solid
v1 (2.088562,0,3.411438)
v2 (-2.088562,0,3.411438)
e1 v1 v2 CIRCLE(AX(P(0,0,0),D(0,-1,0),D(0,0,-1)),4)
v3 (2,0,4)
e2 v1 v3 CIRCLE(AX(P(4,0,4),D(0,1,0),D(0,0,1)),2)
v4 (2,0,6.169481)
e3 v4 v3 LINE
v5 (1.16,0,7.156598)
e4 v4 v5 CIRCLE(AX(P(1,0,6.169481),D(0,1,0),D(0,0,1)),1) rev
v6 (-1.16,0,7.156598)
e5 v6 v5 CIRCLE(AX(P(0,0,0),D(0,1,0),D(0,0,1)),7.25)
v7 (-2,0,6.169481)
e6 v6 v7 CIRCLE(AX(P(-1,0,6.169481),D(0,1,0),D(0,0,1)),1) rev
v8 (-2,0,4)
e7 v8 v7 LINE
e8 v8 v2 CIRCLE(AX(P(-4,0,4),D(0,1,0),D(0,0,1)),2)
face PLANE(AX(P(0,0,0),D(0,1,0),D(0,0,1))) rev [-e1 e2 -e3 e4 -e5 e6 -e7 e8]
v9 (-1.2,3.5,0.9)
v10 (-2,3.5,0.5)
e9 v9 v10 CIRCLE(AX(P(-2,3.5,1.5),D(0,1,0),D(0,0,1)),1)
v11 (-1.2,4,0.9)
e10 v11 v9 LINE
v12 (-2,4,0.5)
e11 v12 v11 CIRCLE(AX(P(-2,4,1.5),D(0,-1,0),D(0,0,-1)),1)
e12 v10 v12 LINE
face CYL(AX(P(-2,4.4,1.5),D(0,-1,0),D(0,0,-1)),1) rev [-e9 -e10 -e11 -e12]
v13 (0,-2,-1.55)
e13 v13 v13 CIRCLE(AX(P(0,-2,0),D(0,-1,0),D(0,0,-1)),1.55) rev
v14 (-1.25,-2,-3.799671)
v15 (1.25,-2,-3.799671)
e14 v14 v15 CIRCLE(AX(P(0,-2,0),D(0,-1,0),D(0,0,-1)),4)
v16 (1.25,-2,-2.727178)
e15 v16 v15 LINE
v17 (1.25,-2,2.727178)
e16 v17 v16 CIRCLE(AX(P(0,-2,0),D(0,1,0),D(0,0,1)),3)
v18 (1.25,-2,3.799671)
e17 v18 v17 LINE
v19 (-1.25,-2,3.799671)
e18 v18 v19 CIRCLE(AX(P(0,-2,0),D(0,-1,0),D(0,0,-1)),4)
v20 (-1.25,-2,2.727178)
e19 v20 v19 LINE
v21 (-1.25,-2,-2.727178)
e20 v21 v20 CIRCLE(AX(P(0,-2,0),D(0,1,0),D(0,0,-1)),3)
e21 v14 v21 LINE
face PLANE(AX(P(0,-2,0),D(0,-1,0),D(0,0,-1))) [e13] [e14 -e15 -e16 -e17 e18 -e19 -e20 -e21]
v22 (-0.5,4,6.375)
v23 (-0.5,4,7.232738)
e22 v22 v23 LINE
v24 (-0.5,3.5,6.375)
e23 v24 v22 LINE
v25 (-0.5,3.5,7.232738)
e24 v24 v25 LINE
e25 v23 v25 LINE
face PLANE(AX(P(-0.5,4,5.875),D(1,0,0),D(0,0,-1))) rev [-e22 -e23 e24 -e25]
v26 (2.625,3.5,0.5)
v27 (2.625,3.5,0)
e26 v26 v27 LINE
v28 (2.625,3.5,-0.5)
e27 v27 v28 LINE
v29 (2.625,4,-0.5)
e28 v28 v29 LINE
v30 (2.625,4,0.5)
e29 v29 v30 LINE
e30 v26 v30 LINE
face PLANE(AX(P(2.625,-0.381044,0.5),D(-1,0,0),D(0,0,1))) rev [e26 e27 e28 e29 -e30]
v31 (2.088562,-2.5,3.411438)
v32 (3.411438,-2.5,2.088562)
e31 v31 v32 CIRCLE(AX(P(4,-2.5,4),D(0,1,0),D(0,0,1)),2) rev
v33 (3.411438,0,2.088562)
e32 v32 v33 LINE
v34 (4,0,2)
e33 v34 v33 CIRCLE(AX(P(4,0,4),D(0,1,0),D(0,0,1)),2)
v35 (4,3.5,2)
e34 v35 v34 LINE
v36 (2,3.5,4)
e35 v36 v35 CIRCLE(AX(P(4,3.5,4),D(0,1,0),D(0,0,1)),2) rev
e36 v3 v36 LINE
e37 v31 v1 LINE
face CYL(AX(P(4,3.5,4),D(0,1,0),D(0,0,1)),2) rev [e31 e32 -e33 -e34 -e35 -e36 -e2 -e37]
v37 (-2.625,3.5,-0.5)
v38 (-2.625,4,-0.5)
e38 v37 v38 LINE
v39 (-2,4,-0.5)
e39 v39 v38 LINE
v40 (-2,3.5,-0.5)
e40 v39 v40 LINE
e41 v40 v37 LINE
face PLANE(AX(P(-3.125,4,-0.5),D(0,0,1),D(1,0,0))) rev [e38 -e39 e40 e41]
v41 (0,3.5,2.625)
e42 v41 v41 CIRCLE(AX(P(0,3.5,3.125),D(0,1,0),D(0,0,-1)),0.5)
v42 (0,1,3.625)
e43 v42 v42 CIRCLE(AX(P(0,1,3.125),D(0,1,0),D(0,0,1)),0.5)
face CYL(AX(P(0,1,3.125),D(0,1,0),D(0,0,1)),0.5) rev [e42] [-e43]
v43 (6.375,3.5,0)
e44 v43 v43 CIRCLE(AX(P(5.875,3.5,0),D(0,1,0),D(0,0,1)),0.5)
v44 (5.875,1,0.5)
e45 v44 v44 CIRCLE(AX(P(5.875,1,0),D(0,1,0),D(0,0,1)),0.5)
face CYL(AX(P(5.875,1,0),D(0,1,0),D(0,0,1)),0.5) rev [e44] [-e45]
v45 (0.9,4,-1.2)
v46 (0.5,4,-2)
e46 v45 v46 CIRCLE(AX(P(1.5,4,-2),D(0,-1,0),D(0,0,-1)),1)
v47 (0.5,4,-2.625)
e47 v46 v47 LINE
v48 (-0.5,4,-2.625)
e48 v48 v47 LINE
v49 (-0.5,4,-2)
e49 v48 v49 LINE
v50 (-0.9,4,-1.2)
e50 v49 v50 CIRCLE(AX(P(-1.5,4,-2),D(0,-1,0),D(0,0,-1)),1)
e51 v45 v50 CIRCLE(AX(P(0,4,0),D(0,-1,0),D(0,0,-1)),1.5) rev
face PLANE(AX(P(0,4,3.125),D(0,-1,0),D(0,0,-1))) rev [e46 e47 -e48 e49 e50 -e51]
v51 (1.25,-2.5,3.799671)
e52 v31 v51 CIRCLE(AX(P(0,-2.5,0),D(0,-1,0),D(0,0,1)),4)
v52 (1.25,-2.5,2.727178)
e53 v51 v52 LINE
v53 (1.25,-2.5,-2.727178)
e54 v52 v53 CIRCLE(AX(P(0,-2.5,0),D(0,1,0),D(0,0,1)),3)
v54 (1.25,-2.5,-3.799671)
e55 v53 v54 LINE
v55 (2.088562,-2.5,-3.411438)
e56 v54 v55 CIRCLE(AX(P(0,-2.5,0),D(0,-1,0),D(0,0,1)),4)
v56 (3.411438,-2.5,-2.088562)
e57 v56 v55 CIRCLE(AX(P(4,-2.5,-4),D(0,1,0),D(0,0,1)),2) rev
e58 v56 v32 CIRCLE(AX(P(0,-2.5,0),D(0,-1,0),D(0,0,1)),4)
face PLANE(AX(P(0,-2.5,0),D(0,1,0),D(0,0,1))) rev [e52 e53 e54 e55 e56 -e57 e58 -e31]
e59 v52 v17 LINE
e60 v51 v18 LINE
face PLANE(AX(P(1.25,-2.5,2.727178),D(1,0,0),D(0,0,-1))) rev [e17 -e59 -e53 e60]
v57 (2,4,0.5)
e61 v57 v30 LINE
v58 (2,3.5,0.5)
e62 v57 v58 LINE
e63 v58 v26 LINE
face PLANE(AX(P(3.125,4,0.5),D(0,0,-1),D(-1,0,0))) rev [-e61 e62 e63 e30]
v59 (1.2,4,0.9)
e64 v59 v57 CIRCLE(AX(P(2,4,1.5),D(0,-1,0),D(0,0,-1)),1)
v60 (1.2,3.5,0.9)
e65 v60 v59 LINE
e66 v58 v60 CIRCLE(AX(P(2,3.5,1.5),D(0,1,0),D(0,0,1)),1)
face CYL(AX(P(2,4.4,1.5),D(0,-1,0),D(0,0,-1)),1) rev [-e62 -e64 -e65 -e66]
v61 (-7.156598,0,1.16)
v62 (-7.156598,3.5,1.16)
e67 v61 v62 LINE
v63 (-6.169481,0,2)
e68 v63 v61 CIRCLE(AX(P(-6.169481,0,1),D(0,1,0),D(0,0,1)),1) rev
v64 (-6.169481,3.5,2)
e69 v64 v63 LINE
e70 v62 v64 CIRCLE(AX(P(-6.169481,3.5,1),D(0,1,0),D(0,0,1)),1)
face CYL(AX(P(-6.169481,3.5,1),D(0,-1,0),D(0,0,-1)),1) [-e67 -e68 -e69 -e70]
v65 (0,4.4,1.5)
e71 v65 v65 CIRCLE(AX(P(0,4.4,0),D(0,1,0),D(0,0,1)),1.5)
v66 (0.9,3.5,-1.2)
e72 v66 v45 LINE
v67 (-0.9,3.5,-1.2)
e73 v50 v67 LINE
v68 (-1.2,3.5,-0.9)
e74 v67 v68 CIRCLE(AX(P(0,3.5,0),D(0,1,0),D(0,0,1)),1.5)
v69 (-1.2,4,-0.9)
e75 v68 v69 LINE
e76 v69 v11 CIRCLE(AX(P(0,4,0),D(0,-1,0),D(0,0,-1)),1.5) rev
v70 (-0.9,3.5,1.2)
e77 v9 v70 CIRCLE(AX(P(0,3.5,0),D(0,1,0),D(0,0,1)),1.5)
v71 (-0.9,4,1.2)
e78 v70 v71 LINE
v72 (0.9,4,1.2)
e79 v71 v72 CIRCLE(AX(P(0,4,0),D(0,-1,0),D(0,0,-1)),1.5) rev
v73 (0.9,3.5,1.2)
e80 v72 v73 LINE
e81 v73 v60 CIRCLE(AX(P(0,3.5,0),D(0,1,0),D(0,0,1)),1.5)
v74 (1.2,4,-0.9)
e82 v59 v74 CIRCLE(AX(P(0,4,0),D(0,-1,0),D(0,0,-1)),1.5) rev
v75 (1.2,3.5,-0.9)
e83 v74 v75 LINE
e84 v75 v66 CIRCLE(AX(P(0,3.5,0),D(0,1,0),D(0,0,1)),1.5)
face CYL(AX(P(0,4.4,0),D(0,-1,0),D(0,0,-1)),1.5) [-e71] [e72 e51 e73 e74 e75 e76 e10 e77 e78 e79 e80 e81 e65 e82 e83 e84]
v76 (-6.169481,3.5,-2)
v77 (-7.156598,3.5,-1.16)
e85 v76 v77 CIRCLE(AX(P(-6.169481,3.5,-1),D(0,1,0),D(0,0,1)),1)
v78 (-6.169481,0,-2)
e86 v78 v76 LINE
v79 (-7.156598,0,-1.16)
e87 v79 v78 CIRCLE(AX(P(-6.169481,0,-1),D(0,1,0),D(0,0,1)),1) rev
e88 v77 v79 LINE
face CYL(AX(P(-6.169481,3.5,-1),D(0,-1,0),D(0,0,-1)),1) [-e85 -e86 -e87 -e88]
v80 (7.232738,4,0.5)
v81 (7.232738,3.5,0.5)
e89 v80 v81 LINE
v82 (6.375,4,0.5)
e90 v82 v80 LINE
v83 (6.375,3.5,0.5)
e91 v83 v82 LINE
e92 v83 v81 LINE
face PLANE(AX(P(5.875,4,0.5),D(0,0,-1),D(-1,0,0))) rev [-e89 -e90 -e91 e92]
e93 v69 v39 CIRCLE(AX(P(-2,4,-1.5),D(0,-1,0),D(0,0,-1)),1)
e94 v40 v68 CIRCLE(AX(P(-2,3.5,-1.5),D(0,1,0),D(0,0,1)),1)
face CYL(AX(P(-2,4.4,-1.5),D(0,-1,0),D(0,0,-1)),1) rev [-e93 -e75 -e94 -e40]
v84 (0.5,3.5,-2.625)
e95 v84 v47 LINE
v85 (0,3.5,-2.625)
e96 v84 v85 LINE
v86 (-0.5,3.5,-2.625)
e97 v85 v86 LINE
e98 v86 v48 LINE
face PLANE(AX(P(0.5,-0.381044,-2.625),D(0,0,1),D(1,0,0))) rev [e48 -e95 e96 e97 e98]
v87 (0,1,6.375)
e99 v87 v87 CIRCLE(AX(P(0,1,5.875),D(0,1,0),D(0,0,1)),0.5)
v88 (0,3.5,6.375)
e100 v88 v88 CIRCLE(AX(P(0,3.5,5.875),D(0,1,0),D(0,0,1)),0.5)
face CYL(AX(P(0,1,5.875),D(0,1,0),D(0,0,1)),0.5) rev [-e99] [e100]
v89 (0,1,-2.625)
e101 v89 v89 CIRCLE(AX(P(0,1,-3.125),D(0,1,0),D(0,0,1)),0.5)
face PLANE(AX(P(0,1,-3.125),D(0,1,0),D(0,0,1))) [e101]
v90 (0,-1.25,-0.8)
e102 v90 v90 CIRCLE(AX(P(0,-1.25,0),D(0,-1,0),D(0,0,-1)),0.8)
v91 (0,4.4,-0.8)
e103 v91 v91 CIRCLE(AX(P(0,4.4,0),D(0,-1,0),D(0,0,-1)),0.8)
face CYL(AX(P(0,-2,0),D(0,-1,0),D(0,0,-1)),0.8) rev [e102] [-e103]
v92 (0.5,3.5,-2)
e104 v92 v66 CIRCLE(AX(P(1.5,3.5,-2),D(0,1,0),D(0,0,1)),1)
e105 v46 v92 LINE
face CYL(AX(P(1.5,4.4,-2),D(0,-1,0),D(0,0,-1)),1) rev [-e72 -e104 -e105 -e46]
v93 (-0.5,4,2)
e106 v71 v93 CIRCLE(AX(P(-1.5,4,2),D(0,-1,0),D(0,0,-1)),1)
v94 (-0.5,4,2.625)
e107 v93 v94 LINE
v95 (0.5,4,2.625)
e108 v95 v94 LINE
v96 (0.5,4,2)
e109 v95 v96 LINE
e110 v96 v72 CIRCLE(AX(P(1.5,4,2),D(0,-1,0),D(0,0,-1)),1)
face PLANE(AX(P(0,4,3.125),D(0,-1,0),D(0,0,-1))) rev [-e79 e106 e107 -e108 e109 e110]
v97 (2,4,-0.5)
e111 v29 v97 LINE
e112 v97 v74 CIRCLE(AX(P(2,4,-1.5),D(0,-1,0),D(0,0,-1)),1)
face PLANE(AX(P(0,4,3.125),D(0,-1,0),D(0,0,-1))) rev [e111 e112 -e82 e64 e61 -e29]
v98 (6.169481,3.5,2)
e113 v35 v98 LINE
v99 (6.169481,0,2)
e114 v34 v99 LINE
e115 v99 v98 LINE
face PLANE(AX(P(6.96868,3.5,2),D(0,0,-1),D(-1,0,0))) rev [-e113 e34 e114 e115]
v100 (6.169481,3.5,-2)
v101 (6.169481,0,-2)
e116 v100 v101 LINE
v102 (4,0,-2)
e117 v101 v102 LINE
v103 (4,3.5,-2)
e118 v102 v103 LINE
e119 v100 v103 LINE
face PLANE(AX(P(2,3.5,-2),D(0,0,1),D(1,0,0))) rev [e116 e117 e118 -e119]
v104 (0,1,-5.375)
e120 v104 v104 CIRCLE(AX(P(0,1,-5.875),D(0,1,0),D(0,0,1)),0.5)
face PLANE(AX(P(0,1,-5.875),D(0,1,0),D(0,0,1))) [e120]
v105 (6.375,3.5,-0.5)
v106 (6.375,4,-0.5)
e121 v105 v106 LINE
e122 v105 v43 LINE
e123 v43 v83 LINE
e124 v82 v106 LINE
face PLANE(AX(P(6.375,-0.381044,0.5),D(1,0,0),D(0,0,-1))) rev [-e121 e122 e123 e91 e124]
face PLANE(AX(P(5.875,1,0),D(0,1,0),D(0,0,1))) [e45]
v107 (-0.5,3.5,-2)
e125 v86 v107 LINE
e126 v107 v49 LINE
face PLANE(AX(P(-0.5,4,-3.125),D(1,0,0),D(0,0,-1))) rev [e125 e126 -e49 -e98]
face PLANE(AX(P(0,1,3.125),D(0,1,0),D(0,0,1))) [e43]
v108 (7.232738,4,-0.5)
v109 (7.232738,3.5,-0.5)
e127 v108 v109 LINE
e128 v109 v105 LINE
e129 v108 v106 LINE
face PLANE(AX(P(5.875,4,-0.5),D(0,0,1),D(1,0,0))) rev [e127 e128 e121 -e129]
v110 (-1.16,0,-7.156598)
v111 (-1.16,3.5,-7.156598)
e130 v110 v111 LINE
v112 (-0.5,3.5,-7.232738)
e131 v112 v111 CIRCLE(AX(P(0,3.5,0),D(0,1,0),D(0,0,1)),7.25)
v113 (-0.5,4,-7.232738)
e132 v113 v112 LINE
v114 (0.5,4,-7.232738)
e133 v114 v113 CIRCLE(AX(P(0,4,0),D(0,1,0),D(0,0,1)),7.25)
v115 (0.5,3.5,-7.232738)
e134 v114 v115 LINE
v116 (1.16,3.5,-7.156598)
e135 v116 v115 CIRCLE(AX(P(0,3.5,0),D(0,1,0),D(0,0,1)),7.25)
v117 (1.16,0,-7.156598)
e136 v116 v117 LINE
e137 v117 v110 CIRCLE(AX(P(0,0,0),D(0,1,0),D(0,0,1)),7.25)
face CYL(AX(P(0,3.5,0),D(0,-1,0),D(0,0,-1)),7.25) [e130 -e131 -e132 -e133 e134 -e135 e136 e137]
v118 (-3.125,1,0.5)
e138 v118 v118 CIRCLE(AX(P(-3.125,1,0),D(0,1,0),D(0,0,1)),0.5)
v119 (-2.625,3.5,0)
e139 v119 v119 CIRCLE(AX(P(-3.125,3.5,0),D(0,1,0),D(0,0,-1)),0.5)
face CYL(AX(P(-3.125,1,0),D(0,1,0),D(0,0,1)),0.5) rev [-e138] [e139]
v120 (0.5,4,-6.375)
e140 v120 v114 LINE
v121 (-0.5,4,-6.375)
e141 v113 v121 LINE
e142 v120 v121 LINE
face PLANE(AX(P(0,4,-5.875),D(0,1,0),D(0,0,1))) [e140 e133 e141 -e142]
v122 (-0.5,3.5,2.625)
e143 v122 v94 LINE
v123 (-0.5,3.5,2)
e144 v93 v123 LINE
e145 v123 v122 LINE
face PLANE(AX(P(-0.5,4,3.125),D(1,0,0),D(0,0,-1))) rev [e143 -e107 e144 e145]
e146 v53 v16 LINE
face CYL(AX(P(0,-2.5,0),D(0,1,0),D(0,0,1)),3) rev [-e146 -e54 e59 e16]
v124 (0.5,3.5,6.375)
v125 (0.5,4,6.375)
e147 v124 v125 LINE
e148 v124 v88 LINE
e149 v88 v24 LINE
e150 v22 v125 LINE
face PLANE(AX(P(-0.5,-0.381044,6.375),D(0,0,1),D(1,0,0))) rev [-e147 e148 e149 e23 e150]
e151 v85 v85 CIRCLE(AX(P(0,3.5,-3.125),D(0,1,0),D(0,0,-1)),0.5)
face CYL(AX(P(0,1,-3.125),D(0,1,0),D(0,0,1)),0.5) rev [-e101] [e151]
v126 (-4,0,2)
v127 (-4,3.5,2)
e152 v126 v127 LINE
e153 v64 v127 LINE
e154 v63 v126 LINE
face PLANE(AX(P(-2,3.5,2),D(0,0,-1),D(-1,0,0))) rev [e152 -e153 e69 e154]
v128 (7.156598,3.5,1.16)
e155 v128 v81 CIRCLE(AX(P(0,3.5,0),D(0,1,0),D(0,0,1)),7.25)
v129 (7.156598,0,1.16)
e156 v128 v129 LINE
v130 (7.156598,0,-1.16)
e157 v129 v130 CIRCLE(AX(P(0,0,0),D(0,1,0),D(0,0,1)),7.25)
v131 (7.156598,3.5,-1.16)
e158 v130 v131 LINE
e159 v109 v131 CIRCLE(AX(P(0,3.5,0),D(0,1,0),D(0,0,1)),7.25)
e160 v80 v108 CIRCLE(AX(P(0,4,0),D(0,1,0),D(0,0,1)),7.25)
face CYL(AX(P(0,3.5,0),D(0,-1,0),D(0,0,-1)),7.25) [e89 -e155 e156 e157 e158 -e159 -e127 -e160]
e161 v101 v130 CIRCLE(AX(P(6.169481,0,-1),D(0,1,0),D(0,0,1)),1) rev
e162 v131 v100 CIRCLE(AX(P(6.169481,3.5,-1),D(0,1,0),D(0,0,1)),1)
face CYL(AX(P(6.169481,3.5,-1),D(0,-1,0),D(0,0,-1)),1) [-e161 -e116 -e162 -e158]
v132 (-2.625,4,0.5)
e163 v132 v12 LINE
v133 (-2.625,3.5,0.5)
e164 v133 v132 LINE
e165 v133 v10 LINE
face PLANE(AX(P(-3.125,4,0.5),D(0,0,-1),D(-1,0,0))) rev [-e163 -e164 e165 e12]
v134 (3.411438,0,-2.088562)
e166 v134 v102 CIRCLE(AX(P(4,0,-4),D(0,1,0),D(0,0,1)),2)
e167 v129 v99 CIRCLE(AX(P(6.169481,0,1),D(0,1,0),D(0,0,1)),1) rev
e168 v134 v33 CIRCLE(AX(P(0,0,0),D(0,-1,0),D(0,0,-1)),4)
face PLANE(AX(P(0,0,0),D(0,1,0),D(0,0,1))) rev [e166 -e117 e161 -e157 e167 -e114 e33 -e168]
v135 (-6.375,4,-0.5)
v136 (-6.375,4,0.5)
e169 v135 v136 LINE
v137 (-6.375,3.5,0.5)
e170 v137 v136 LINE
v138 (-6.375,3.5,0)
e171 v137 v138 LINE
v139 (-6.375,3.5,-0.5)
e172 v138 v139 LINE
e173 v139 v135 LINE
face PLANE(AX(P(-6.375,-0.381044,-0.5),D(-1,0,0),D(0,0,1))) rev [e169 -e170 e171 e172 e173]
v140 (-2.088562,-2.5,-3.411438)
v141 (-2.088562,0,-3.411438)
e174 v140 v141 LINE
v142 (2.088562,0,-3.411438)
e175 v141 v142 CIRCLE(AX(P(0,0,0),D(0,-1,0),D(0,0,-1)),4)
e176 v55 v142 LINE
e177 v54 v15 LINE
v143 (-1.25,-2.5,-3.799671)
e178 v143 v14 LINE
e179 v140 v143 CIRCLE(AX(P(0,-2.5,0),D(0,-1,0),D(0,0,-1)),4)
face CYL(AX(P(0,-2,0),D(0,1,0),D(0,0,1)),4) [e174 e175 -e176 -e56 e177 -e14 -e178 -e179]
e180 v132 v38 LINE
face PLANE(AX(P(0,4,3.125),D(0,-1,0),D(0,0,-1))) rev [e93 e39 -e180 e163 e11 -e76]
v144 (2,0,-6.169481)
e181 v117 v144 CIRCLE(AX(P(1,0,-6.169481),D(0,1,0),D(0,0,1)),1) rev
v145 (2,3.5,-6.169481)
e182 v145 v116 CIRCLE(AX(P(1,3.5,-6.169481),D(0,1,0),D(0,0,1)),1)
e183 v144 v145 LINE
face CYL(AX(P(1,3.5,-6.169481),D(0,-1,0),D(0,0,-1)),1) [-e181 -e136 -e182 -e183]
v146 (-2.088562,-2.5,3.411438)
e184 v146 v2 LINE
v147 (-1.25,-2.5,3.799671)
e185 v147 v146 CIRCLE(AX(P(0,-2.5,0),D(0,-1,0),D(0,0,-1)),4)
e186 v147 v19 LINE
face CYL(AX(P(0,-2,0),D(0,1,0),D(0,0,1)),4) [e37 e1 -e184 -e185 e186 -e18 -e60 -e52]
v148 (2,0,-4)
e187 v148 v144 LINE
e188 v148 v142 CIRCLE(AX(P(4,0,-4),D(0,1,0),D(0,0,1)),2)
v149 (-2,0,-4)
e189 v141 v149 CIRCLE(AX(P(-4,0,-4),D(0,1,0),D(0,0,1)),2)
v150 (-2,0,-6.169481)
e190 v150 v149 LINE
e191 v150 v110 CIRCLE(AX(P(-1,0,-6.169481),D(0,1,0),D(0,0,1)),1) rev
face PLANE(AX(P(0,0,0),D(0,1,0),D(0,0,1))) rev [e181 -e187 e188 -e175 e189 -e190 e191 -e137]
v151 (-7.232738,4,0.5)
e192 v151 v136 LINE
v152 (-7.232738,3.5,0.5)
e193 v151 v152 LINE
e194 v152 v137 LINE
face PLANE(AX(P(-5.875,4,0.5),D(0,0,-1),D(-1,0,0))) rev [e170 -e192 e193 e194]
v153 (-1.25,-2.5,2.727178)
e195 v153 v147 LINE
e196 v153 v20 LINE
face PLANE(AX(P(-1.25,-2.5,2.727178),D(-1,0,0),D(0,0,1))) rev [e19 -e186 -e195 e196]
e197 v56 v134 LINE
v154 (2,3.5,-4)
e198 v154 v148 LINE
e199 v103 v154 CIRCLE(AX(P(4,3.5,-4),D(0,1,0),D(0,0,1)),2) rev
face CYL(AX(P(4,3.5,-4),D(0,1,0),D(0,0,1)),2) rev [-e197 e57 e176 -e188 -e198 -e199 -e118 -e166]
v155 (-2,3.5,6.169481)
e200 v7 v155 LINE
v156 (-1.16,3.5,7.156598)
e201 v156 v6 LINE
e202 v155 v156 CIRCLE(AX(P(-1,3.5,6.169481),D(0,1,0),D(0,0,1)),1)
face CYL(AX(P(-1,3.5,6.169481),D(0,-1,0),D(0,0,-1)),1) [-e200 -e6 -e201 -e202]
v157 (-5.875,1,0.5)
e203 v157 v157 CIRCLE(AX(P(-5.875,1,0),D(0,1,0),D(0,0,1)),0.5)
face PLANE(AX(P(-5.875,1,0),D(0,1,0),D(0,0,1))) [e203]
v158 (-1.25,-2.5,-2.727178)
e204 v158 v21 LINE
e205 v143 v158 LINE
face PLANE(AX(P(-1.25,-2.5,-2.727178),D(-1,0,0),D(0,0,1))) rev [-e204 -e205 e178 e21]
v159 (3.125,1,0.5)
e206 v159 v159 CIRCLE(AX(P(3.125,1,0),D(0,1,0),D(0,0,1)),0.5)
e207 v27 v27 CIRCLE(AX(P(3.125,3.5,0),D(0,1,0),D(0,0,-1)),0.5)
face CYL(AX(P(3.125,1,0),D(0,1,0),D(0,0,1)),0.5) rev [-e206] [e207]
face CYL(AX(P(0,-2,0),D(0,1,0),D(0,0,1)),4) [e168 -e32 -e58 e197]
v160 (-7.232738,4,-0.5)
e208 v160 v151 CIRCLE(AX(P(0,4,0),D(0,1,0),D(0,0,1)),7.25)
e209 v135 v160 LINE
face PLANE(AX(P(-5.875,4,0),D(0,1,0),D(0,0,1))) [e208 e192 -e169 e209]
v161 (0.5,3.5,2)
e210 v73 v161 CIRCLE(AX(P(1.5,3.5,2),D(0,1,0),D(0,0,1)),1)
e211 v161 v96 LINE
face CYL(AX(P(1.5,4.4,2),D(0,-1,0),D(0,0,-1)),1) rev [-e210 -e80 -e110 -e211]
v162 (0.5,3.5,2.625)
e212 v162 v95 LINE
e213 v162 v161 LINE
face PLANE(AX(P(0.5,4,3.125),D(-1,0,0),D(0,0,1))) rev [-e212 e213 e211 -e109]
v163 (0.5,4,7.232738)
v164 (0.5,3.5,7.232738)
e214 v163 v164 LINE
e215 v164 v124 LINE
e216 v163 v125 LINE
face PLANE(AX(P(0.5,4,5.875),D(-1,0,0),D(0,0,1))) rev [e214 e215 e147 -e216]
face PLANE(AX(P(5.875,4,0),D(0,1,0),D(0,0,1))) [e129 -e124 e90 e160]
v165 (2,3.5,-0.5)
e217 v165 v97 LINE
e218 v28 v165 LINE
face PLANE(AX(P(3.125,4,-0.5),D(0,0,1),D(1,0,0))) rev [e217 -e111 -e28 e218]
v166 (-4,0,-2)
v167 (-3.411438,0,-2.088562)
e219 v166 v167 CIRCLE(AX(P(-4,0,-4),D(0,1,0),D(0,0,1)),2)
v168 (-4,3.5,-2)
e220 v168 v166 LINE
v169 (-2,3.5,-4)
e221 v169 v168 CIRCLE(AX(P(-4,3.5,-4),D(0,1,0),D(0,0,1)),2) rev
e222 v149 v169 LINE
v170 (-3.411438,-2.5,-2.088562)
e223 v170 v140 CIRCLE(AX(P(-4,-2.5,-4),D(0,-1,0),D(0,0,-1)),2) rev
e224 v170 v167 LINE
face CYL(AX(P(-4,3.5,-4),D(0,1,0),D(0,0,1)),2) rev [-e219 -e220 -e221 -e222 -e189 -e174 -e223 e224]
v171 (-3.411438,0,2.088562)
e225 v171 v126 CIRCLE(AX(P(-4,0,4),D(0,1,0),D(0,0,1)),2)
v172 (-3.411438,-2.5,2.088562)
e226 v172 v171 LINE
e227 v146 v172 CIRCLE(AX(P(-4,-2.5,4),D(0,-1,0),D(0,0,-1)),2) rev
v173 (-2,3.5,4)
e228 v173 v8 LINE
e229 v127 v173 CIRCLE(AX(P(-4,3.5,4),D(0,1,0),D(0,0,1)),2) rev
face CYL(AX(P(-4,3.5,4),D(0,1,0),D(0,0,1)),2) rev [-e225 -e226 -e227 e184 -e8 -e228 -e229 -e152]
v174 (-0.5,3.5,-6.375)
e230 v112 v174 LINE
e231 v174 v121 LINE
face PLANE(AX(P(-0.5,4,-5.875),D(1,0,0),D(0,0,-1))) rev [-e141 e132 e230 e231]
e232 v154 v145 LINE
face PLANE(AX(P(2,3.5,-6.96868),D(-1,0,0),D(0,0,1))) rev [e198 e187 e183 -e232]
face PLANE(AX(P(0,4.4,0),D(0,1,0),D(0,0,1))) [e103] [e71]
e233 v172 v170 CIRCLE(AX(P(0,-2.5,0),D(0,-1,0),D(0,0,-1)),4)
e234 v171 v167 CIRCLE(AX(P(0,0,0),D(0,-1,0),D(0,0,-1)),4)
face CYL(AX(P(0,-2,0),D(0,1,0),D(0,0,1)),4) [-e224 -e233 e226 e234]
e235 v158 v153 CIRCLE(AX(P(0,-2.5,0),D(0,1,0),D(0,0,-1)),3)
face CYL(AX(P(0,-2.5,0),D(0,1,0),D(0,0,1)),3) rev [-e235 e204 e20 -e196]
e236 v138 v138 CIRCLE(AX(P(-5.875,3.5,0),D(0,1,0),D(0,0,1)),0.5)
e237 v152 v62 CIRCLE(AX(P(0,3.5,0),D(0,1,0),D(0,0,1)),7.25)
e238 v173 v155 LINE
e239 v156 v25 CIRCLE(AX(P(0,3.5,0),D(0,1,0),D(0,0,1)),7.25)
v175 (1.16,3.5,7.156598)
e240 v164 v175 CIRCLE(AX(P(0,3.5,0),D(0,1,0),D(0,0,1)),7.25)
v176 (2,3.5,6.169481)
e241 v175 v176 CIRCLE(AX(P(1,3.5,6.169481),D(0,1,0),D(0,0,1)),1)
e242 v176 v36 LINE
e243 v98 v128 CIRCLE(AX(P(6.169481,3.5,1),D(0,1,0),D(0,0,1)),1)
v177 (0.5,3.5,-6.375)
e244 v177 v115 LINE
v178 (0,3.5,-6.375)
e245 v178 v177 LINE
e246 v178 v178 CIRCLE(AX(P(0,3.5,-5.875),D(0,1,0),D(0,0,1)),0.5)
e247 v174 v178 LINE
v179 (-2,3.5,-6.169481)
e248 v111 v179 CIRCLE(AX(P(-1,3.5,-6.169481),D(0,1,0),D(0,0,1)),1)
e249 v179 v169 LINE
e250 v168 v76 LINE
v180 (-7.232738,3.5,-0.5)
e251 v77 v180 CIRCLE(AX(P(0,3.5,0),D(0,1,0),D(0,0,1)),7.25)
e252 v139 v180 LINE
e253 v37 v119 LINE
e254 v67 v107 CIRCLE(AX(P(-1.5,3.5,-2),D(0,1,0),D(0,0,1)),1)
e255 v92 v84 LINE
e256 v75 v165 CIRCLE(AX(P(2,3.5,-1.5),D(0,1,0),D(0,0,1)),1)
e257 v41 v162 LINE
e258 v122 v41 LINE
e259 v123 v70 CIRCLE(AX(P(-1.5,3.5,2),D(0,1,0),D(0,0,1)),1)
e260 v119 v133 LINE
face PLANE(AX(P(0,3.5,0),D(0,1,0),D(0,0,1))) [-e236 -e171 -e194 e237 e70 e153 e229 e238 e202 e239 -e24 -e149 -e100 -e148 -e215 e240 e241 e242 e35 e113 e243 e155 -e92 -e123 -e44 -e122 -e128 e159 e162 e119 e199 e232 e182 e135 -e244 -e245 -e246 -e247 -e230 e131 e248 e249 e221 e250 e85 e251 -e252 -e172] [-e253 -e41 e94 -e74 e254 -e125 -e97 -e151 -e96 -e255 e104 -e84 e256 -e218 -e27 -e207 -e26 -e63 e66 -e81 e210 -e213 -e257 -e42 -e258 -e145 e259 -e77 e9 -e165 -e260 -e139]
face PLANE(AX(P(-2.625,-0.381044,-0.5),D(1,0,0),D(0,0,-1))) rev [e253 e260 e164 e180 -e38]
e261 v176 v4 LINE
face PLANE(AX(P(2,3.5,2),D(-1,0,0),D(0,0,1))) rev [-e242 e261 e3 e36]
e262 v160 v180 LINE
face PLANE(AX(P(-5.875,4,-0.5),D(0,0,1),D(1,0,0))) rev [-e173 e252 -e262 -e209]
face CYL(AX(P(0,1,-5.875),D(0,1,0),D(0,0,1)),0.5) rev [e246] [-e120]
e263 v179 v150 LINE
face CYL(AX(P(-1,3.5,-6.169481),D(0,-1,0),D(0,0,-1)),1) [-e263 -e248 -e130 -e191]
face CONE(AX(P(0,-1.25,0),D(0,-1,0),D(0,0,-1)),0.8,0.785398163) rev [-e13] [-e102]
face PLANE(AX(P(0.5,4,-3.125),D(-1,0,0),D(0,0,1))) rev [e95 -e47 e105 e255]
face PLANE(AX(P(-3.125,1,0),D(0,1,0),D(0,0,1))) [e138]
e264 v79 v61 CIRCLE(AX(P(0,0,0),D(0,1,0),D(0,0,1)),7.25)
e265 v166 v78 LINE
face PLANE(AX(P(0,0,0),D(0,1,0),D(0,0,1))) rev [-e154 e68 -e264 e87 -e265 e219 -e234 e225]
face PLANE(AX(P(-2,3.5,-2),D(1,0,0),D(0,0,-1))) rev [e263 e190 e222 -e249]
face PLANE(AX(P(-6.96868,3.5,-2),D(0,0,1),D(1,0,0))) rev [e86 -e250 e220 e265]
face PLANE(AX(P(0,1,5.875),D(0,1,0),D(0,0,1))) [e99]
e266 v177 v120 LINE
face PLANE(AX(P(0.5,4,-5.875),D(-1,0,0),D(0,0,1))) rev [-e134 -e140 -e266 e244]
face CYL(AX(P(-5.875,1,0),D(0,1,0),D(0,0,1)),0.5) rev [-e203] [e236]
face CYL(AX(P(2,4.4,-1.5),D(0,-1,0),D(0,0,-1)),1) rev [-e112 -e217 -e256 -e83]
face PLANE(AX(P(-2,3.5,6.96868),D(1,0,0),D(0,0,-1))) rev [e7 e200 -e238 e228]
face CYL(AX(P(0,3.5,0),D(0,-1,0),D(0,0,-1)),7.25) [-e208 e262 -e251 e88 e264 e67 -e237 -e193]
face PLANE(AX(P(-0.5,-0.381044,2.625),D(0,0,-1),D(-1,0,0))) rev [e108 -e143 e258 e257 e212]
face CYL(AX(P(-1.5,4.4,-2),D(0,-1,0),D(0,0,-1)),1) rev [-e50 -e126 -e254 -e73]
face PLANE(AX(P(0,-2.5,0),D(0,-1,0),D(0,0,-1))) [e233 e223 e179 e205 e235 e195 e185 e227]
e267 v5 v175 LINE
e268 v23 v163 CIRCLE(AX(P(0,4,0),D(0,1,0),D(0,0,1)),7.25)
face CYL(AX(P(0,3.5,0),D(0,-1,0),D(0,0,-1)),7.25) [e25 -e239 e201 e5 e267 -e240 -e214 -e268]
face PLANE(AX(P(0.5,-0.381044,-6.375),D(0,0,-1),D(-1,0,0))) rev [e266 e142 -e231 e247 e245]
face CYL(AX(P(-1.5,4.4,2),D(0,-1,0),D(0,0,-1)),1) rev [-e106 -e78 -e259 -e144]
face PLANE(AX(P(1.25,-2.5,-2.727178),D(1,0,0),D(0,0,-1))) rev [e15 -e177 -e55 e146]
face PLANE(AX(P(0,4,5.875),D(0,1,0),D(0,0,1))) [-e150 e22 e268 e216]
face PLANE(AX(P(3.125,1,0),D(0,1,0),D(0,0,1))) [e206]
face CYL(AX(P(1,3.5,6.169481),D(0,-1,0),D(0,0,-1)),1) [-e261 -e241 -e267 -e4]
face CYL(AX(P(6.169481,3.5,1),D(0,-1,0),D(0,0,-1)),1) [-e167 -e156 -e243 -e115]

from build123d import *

# Parameters (mm, degrees)
BOSS_EXTRUDE1_DEPTH   = 3.5
BOSS_EXTRUDE2_DEPTH   = 0.5
SKETCH6_R             = 4
BOSS_EXTRUDE4_DEPTH   = 2
FILLET1_R             = 1
SKETCH13_R            = 1.5
BOSS_EXTRUDE7_DEPTH   = 0.9
M2X0_4_TAPPED_HOLE1_D = 1.6
BOSS_EXTRUDE5_DEPTH   = 0.5
CUT_EXTRUDE1_START    = -3
SKETCH5_R             = 0.5
CUT_EXTRUDE1_DEPTH    = 3
SKETCH10_W            = 1
SKETCH10_H            = 3.75
SKETCH10_W_2          = 3.75
SKETCH10_H_2          = 1
CUT_EXTRUDE2_DEPTH    = 0.5
CHAMFER1_SIZE         = 0.75
FILLET2_R             = 2
CUT_EXTRUDE3_REACH    = 13.157
FILLET3_R             = 1


with BuildPart() as part:
    # Sketch3 → Boss-Extrude1 (new body)
    with BuildSketch(Plane(origin=(0, 0, 0), x_dir=(1, 0, 0), z_dir=(0, 1, 0))):
        with BuildLine():
            Line((-2, -6.968679932), (-2, -2))
            Line((-2, -2), (-6.968679932, -2))
            ThreePointArc((-6.968679932, -2), (-7.179325508, -1.009844169), (-7.25, 0))
            ThreePointArc((-7.25, 0), (-7.179325508, 1.009844169), (-6.968679932, 2))
            Line((-6.968679932, 2), (-2, 2))
            Line((-2, 2), (-2, 6.968679932))
            ThreePointArc((-2, 6.968679932), (-1.009844169, 7.179325508), (0, 7.25))
            ThreePointArc((0, 7.25), (1.009844169, 7.179325508), (2, 6.968679932))
            Line((2, 6.968679932), (2, 2))
            Line((2, 2), (6.968679932, 2))
            ThreePointArc((6.968679932, 2), (7.179325508, 1.009844169), (7.25, 0))
            ThreePointArc((7.25, 0), (7.179325508, -1.009844169), (6.968679932, -2))
            Line((6.968679932, -2), (2, -2))
            Line((2, -2), (2, -6.968679932))
            ThreePointArc((2, -6.968679932), (1.009844169, -7.179325508), (0, -7.25))
            ThreePointArc((0, -7.25), (-1.009844169, -7.179325508), (-2, -6.968679932))
        make_face()
    extrude(amount=BOSS_EXTRUDE1_DEPTH)

    # Sketch4 → Boss-Extrude2 (add)
    with BuildSketch(Plane(origin=(0, 3.5, 0), x_dir=(-1, 0, 0), z_dir=(0, 1, 0))):
        with BuildLine():
            Line((-0.5, 5.875), (-0.5, 7.232738071))
            ThreePointArc((-0.5, 7.232738071), (0, 7.25), (0.5, 7.232738071))
            Line((0.5, 7.232738071), (0.5, 5.875))
            ThreePointArc((0.5, 5.875), (0, 5.375), (-0.5, 5.875))
        make_face()
        with BuildLine():
            Line((0.5, 3.125), (0.5, 0.5))
            Line((0.5, 0.5), (3.125, 0.5))
            ThreePointArc((3.125, 0.5), (3.625, 0), (3.125, -0.5))
            Line((3.125, -0.5), (0.5, -0.5))
            Line((0.5, -0.5), (0.5, -3.125))
            ThreePointArc((0.5, -3.125), (0, -3.625), (-0.5, -3.125))
            Line((-0.5, -3.125), (-0.5, -0.5))
            Line((-0.5, -0.5), (-3.125, -0.5))
            ThreePointArc((-3.125, -0.5), (-3.625, 0), (-3.125, 0.5))
            Line((-3.125, 0.5), (-0.5, 0.5))
            Line((-0.5, 0.5), (-0.5, 3.125))
            ThreePointArc((-0.5, 3.125), (0, 3.625), (0.5, 3.125))
        make_face()
        with BuildLine():
            Line((5.875, 0.5), (7.232738071, 0.5))
            ThreePointArc((7.232738071, 0.5), (7.25, 0), (7.232738071, -0.5))
            Line((7.232738071, -0.5), (5.875, -0.5))
            ThreePointArc((5.875, -0.5), (5.375, 0), (5.875, 0.5))
        make_face()
        with BuildLine():
            Line((0.5, -5.875), (0.5, -7.232738071))
            ThreePointArc((0.5, -7.232738071), (0, -7.25), (-0.5, -7.232738071))
            Line((-0.5, -7.232738071), (-0.5, -5.875))
            ThreePointArc((-0.5, -5.875), (0, -5.375), (0.5, -5.875))
        make_face()
        with BuildLine():
            Line((-5.875, -0.5), (-7.232738071, -0.5))
            ThreePointArc((-7.232738071, -0.5), (-7.25, 0), (-7.232738071, 0.5))
            Line((-7.232738071, 0.5), (-5.875, 0.5))
            ThreePointArc((-5.875, 0.5), (-5.375, 0), (-5.875, -0.5))
        make_face()
    extrude(amount=BOSS_EXTRUDE2_DEPTH)

    # Sketch6 → Boss-Extrude4 (add)
    with BuildSketch(Plane.XZ):
        with Locations(Location((0, 0, 0), (0, 0, 120))):
            Circle(SKETCH6_R)
    extrude(amount=BOSS_EXTRUDE4_DEPTH)

    # Fillet1
    fillet1_edges = [part.edges().sort_by_distance(p)[0] for p in [
        (-2, 1.75, 6.968679932),
        (-6.968679932, 1.75, 2),
        (-6.968679932, 1.75, -2),
        (-2, 1.75, -6.968679932),
        (2, 1.75, -6.968679932),
        (6.968679932, 1.75, -2),
        (6.968679932, 1.75, 2),
        (2, 1.75, 6.968679932),
    ]]
    fillet(fillet1_edges, radius=FILLET1_R)

    # Sketch13 → Boss-Extrude7 (add)
    with BuildSketch(Plane(origin=(0, 3.5, 0), x_dir=(1, 0, 0), z_dir=(0, 1, 0))):
        with Locations(Location((0, 0, 0), (0, 0, 109.471220634))):
            Circle(SKETCH13_R)
    extrude(amount=BOSS_EXTRUDE7_DEPTH)

    # M2x0.4 Tapped Hole1 (through all)
    with Locations(Plane(origin=(0, -2, 0), x_dir=(-1, 0, 0), z_dir=(0, -1, 0))):
        with Locations((0, 0)):
            Hole(M2X0_4_TAPPED_HOLE1_D / 2)

    # Sketch9 → Boss-Extrude5 (add)
    with BuildSketch(Plane.XZ.offset(2)):
        with BuildLine():
            Line((-1.25, -2.727178029), (-1.25, -3.799671038))
            ThreePointArc((-1.25, -3.799671038), (-4, 0), (-1.25, 3.799671038))
            Line((-1.25, 3.799671038), (-1.25, 2.727178029))
            ThreePointArc((-1.25, 2.727178029), (-3, 0), (-1.25, -2.727178029))
        make_face()
        with BuildLine():
            Line((1.25, 2.727178029), (1.25, 3.799671038))
            ThreePointArc((1.25, 3.799671038), (4, 0), (1.25, -3.799671038))
            Line((1.25, -3.799671038), (1.25, -2.727178029))
            ThreePointArc((1.25, -2.727178029), (3, 0), (1.25, 2.727178029))
        make_face()
    extrude(amount=BOSS_EXTRUDE5_DEPTH)

    # Sketch5 → Cut-Extrude1 (cut)
    with BuildSketch(Plane(origin=(0, 4, 0), x_dir=(-1, 0, 0), z_dir=(0, 1, 0)).offset(CUT_EXTRUDE1_START)):
        with Locations(Location((0, 5.875, 0), (0, 0, 90))):
            Circle(SKETCH5_R)
        with Locations(Location((0, 3.125, 0), (0, 0, 90))):
            Circle(SKETCH5_R)
        with Locations(Location((5.875, 0, 0), (0, 0, 90))):
            Circle(SKETCH5_R)
        with Locations(Location((3.125, 0, 0), (0, 0, 90))):
            Circle(SKETCH5_R)
        with Locations(Location((0, -5.875, 0), (0, 0, 90))):
            Circle(SKETCH5_R)
        with Locations(Location((0, -3.125, 0), (0, 0, 90))):
            Circle(SKETCH5_R)
        with Locations(Location((-5.875, 0, 0), (0, 0, 90))):
            Circle(SKETCH5_R)
        with Locations(Location((-3.125, 0, 0), (0, 0, 90))):
            Circle(SKETCH5_R)
    extrude(amount=CUT_EXTRUDE1_DEPTH, mode=Mode.SUBTRACT)

    # Sketch10 → Cut-Extrude2 (cut)
    with BuildSketch(Plane(origin=(0, 4, 0), x_dir=(1, 0, 0), z_dir=(0, 1, 0))):
        with Locations((0, -4.5)):
            Rectangle(SKETCH10_W, SKETCH10_H)
        with Locations((-4.5, 0)):
            Rectangle(SKETCH10_W_2, SKETCH10_H_2)
        with Locations((0, 4.5)):
            Rectangle(SKETCH10_W, SKETCH10_H)
        with Locations((4.5, 0)):
            Rectangle(SKETCH10_W_2, SKETCH10_H_2)
    extrude(amount=-CUT_EXTRUDE2_DEPTH, mode=Mode.SUBTRACT)

    # Chamfer1
    chamfer1_edges = [part.edges().sort_by_distance(p)[0] for p in [
        (-0.8, -2, 0),
    ]]
    chamfer(chamfer1_edges, length=CHAMFER1_SIZE)

    # Fillet2
    # the kernel refuses this fillet: 2 mm, written as the material it adds along each edge
    with BuildSketch(Plane(origin=(-2, 0, 2), x_dir=(0, 0, 1), z_dir=(0, 1, 0)), Plane(origin=(-2, 0, -2), x_dir=(-1, 0, 0), z_dir=(0, 1, 0)), Plane(origin=(2, 0, -2), x_dir=(0, 0, -1), z_dir=(0, 1, 0)), Plane(origin=(2, 0, 2), x_dir=(1, 0, 0), z_dir=(0, 1, 0))) as fillet2_piece_1:
        with BuildLine():
            CenterArc((FILLET2_R, -FILLET2_R), FILLET2_R, 90, 90)
            Line((0, -FILLET2_R), (0, 0))
            Line((0, 0), (FILLET2_R, 0))
        make_face()
    extrude(amount=3.5)

    # Sketch11 → Cut-Extrude3 (cut, up to next)
    with BuildSketch(Plane(origin=(0, 0, 0), x_dir=(1, 0, 0), z_dir=(0, 1, 0)), mode=Mode.PRIVATE) as cut_extrude3_sk1:
        with BuildLine():
            ThreePointArc((3.411437828, -2.088562172), (2.585786438, -2.585786438), (2.088562172, -3.411437828))
            ThreePointArc((2.088562172, -3.411437828), (2.828427125, -2.828427125), (3.411437828, -2.088562172))
        make_face()
    cut_extrude3_tool1 = extrude(cut_extrude3_sk1.sketch, amount=-CUT_EXTRUDE3_REACH, mode=Mode.PRIVATE) & part.part
    # Sketch11 → Cut-Extrude3 (cut, up to next)
    with BuildSketch(Plane(origin=(0, 0, 0), x_dir=(1, 0, 0), z_dir=(0, 1, 0)), mode=Mode.PRIVATE) as cut_extrude3_sk2:
        with BuildLine():
            ThreePointArc((2.088562172, 3.411437828), (2.585786438, 2.585786438), (3.411437828, 2.088562172))
            ThreePointArc((3.411437828, 2.088562172), (2.828427125, 2.828427125), (2.088562172, 3.411437828))
        make_face()
    cut_extrude3_tool2 = extrude(cut_extrude3_sk2.sketch, amount=-CUT_EXTRUDE3_REACH, mode=Mode.PRIVATE) & part.part
    # Sketch11 → Cut-Extrude3 (cut, up to next)
    with BuildSketch(Plane(origin=(0, 0, 0), x_dir=(1, 0, 0), z_dir=(0, 1, 0)), mode=Mode.PRIVATE) as cut_extrude3_sk3:
        with BuildLine():
            ThreePointArc((-3.411437828, 2.088562172), (-2.585786438, 2.585786438), (-2.088562172, 3.411437828))
            ThreePointArc((-2.088562172, 3.411437828), (-2.828427125, 2.828427125), (-3.411437828, 2.088562172))
        make_face()
    cut_extrude3_tool3 = extrude(cut_extrude3_sk3.sketch, amount=-CUT_EXTRUDE3_REACH, mode=Mode.PRIVATE) & part.part
    # Sketch11 → Cut-Extrude3 (cut, up to next)
    with BuildSketch(Plane(origin=(0, 0, 0), x_dir=(1, 0, 0), z_dir=(0, 1, 0)), mode=Mode.PRIVATE) as cut_extrude3_sk4:
        with BuildLine():
            ThreePointArc((-2.088562172, -3.411437828), (-2.585786438, -2.585786438), (-3.411437828, -2.088562172))
            ThreePointArc((-3.411437828, -2.088562172), (-2.828427125, -2.828427125), (-2.088562172, -3.411437828))
        make_face()
    cut_extrude3_tool4 = extrude(cut_extrude3_sk4.sketch, amount=-CUT_EXTRUDE3_REACH, mode=Mode.PRIVATE) & part.part
    add(cut_extrude3_tool1.solids().sort_by_distance((2.71527, 0, 2.71527))[0], mode=Mode.SUBTRACT)
    add(cut_extrude3_tool2.solids().sort_by_distance((2.71527, 0, -2.71527))[0], mode=Mode.SUBTRACT)
    add(cut_extrude3_tool3.solids().sort_by_distance((-2.71527, 0, -2.71527))[0], mode=Mode.SUBTRACT)
    add(cut_extrude3_tool4.solids().sort_by_distance((-2.71527, 0, 2.71527))[0], mode=Mode.SUBTRACT)

    # Fillet3
    # the kernel refuses this fillet: 1 mm, written as the material it adds along each edge
    with BuildSketch(Plane(origin=(-1.414213562, 4, -0.5), x_dir=(0.4720978535930623, 0, -0.8815461511644318), z_dir=(0, -1, 0)), Plane(origin=(-0.5, 4, 1.414213562), x_dir=(-0.8815461511644338, 0, -0.47209785359305884), z_dir=(0, -1, 0)), Plane(origin=(1.414213562, 4, 0.5), x_dir=(-0.47209785359305845, 0, 0.881546151164434), z_dir=(0, -1, 0)), Plane(origin=(0.5, 4, -1.414213562), x_dir=(0.8815461511644322, 0, 0.4720978535930617), z_dir=(0, -1, 0)), Plane(origin=(-0.5, 2.035533906, -1.414213562), x_dir=(-0.8815461511644342, 0, 0.47209785359305795), z_dir=(0, 1, 0))) as fillet3_piece_1:
        with BuildLine():
            CenterArc((0.604997631, -0.988495633), FILLET3_R, 98.699338506, 53.130102354)
            Line((-0.27654852, -0.516397779), (0, 0))
            ThreePointArc((0, 0), (0.226874112, -0.01725655), (0.453748223, 0))
        make_face()
    extrude(amount=1.964466094)
    with BuildSketch(Plane(origin=(-1.414213562, 4, 0.5), x_dir=(0.472097853593057, 0, 0.8815461511644348), z_dir=(0, -1, 0)), Plane(origin=(0.5, 4, 1.414213562), x_dir=(0.8815461511644329, 0, -0.47209785359306067), z_dir=(0, -1, 0))) as fillet3_piece_2:
        with BuildLine():
            CenterArc((0.604997631, 0.988495633), FILLET3_R, 208.17055914, 53.130102354)
            Line((-0.27654852, 0.516397779), (0, 0))
            ThreePointArc((0, 0), (0.226874112, 0.01725655), (0.453748223, 0))
        make_face()
    extrude(amount=1.964466094)
    with BuildSketch(Plane(origin=(1.414213562, 4, -0.5), x_dir=(1, 0, 0), z_dir=(0, -1, 0))) as fillet3_piece_3:
        with BuildLine():
            CenterArc((0.585786438, -1), FILLET3_R, 90, 53.130102354)
            ThreePointArc((-0.214213562, -0.4), (-0.091894336, -0.20814678), (0, 0))
            Line((0, 0), (0.585786438, 0))
        make_face()
    extrude(amount=1.964466094)


solid = part.part
